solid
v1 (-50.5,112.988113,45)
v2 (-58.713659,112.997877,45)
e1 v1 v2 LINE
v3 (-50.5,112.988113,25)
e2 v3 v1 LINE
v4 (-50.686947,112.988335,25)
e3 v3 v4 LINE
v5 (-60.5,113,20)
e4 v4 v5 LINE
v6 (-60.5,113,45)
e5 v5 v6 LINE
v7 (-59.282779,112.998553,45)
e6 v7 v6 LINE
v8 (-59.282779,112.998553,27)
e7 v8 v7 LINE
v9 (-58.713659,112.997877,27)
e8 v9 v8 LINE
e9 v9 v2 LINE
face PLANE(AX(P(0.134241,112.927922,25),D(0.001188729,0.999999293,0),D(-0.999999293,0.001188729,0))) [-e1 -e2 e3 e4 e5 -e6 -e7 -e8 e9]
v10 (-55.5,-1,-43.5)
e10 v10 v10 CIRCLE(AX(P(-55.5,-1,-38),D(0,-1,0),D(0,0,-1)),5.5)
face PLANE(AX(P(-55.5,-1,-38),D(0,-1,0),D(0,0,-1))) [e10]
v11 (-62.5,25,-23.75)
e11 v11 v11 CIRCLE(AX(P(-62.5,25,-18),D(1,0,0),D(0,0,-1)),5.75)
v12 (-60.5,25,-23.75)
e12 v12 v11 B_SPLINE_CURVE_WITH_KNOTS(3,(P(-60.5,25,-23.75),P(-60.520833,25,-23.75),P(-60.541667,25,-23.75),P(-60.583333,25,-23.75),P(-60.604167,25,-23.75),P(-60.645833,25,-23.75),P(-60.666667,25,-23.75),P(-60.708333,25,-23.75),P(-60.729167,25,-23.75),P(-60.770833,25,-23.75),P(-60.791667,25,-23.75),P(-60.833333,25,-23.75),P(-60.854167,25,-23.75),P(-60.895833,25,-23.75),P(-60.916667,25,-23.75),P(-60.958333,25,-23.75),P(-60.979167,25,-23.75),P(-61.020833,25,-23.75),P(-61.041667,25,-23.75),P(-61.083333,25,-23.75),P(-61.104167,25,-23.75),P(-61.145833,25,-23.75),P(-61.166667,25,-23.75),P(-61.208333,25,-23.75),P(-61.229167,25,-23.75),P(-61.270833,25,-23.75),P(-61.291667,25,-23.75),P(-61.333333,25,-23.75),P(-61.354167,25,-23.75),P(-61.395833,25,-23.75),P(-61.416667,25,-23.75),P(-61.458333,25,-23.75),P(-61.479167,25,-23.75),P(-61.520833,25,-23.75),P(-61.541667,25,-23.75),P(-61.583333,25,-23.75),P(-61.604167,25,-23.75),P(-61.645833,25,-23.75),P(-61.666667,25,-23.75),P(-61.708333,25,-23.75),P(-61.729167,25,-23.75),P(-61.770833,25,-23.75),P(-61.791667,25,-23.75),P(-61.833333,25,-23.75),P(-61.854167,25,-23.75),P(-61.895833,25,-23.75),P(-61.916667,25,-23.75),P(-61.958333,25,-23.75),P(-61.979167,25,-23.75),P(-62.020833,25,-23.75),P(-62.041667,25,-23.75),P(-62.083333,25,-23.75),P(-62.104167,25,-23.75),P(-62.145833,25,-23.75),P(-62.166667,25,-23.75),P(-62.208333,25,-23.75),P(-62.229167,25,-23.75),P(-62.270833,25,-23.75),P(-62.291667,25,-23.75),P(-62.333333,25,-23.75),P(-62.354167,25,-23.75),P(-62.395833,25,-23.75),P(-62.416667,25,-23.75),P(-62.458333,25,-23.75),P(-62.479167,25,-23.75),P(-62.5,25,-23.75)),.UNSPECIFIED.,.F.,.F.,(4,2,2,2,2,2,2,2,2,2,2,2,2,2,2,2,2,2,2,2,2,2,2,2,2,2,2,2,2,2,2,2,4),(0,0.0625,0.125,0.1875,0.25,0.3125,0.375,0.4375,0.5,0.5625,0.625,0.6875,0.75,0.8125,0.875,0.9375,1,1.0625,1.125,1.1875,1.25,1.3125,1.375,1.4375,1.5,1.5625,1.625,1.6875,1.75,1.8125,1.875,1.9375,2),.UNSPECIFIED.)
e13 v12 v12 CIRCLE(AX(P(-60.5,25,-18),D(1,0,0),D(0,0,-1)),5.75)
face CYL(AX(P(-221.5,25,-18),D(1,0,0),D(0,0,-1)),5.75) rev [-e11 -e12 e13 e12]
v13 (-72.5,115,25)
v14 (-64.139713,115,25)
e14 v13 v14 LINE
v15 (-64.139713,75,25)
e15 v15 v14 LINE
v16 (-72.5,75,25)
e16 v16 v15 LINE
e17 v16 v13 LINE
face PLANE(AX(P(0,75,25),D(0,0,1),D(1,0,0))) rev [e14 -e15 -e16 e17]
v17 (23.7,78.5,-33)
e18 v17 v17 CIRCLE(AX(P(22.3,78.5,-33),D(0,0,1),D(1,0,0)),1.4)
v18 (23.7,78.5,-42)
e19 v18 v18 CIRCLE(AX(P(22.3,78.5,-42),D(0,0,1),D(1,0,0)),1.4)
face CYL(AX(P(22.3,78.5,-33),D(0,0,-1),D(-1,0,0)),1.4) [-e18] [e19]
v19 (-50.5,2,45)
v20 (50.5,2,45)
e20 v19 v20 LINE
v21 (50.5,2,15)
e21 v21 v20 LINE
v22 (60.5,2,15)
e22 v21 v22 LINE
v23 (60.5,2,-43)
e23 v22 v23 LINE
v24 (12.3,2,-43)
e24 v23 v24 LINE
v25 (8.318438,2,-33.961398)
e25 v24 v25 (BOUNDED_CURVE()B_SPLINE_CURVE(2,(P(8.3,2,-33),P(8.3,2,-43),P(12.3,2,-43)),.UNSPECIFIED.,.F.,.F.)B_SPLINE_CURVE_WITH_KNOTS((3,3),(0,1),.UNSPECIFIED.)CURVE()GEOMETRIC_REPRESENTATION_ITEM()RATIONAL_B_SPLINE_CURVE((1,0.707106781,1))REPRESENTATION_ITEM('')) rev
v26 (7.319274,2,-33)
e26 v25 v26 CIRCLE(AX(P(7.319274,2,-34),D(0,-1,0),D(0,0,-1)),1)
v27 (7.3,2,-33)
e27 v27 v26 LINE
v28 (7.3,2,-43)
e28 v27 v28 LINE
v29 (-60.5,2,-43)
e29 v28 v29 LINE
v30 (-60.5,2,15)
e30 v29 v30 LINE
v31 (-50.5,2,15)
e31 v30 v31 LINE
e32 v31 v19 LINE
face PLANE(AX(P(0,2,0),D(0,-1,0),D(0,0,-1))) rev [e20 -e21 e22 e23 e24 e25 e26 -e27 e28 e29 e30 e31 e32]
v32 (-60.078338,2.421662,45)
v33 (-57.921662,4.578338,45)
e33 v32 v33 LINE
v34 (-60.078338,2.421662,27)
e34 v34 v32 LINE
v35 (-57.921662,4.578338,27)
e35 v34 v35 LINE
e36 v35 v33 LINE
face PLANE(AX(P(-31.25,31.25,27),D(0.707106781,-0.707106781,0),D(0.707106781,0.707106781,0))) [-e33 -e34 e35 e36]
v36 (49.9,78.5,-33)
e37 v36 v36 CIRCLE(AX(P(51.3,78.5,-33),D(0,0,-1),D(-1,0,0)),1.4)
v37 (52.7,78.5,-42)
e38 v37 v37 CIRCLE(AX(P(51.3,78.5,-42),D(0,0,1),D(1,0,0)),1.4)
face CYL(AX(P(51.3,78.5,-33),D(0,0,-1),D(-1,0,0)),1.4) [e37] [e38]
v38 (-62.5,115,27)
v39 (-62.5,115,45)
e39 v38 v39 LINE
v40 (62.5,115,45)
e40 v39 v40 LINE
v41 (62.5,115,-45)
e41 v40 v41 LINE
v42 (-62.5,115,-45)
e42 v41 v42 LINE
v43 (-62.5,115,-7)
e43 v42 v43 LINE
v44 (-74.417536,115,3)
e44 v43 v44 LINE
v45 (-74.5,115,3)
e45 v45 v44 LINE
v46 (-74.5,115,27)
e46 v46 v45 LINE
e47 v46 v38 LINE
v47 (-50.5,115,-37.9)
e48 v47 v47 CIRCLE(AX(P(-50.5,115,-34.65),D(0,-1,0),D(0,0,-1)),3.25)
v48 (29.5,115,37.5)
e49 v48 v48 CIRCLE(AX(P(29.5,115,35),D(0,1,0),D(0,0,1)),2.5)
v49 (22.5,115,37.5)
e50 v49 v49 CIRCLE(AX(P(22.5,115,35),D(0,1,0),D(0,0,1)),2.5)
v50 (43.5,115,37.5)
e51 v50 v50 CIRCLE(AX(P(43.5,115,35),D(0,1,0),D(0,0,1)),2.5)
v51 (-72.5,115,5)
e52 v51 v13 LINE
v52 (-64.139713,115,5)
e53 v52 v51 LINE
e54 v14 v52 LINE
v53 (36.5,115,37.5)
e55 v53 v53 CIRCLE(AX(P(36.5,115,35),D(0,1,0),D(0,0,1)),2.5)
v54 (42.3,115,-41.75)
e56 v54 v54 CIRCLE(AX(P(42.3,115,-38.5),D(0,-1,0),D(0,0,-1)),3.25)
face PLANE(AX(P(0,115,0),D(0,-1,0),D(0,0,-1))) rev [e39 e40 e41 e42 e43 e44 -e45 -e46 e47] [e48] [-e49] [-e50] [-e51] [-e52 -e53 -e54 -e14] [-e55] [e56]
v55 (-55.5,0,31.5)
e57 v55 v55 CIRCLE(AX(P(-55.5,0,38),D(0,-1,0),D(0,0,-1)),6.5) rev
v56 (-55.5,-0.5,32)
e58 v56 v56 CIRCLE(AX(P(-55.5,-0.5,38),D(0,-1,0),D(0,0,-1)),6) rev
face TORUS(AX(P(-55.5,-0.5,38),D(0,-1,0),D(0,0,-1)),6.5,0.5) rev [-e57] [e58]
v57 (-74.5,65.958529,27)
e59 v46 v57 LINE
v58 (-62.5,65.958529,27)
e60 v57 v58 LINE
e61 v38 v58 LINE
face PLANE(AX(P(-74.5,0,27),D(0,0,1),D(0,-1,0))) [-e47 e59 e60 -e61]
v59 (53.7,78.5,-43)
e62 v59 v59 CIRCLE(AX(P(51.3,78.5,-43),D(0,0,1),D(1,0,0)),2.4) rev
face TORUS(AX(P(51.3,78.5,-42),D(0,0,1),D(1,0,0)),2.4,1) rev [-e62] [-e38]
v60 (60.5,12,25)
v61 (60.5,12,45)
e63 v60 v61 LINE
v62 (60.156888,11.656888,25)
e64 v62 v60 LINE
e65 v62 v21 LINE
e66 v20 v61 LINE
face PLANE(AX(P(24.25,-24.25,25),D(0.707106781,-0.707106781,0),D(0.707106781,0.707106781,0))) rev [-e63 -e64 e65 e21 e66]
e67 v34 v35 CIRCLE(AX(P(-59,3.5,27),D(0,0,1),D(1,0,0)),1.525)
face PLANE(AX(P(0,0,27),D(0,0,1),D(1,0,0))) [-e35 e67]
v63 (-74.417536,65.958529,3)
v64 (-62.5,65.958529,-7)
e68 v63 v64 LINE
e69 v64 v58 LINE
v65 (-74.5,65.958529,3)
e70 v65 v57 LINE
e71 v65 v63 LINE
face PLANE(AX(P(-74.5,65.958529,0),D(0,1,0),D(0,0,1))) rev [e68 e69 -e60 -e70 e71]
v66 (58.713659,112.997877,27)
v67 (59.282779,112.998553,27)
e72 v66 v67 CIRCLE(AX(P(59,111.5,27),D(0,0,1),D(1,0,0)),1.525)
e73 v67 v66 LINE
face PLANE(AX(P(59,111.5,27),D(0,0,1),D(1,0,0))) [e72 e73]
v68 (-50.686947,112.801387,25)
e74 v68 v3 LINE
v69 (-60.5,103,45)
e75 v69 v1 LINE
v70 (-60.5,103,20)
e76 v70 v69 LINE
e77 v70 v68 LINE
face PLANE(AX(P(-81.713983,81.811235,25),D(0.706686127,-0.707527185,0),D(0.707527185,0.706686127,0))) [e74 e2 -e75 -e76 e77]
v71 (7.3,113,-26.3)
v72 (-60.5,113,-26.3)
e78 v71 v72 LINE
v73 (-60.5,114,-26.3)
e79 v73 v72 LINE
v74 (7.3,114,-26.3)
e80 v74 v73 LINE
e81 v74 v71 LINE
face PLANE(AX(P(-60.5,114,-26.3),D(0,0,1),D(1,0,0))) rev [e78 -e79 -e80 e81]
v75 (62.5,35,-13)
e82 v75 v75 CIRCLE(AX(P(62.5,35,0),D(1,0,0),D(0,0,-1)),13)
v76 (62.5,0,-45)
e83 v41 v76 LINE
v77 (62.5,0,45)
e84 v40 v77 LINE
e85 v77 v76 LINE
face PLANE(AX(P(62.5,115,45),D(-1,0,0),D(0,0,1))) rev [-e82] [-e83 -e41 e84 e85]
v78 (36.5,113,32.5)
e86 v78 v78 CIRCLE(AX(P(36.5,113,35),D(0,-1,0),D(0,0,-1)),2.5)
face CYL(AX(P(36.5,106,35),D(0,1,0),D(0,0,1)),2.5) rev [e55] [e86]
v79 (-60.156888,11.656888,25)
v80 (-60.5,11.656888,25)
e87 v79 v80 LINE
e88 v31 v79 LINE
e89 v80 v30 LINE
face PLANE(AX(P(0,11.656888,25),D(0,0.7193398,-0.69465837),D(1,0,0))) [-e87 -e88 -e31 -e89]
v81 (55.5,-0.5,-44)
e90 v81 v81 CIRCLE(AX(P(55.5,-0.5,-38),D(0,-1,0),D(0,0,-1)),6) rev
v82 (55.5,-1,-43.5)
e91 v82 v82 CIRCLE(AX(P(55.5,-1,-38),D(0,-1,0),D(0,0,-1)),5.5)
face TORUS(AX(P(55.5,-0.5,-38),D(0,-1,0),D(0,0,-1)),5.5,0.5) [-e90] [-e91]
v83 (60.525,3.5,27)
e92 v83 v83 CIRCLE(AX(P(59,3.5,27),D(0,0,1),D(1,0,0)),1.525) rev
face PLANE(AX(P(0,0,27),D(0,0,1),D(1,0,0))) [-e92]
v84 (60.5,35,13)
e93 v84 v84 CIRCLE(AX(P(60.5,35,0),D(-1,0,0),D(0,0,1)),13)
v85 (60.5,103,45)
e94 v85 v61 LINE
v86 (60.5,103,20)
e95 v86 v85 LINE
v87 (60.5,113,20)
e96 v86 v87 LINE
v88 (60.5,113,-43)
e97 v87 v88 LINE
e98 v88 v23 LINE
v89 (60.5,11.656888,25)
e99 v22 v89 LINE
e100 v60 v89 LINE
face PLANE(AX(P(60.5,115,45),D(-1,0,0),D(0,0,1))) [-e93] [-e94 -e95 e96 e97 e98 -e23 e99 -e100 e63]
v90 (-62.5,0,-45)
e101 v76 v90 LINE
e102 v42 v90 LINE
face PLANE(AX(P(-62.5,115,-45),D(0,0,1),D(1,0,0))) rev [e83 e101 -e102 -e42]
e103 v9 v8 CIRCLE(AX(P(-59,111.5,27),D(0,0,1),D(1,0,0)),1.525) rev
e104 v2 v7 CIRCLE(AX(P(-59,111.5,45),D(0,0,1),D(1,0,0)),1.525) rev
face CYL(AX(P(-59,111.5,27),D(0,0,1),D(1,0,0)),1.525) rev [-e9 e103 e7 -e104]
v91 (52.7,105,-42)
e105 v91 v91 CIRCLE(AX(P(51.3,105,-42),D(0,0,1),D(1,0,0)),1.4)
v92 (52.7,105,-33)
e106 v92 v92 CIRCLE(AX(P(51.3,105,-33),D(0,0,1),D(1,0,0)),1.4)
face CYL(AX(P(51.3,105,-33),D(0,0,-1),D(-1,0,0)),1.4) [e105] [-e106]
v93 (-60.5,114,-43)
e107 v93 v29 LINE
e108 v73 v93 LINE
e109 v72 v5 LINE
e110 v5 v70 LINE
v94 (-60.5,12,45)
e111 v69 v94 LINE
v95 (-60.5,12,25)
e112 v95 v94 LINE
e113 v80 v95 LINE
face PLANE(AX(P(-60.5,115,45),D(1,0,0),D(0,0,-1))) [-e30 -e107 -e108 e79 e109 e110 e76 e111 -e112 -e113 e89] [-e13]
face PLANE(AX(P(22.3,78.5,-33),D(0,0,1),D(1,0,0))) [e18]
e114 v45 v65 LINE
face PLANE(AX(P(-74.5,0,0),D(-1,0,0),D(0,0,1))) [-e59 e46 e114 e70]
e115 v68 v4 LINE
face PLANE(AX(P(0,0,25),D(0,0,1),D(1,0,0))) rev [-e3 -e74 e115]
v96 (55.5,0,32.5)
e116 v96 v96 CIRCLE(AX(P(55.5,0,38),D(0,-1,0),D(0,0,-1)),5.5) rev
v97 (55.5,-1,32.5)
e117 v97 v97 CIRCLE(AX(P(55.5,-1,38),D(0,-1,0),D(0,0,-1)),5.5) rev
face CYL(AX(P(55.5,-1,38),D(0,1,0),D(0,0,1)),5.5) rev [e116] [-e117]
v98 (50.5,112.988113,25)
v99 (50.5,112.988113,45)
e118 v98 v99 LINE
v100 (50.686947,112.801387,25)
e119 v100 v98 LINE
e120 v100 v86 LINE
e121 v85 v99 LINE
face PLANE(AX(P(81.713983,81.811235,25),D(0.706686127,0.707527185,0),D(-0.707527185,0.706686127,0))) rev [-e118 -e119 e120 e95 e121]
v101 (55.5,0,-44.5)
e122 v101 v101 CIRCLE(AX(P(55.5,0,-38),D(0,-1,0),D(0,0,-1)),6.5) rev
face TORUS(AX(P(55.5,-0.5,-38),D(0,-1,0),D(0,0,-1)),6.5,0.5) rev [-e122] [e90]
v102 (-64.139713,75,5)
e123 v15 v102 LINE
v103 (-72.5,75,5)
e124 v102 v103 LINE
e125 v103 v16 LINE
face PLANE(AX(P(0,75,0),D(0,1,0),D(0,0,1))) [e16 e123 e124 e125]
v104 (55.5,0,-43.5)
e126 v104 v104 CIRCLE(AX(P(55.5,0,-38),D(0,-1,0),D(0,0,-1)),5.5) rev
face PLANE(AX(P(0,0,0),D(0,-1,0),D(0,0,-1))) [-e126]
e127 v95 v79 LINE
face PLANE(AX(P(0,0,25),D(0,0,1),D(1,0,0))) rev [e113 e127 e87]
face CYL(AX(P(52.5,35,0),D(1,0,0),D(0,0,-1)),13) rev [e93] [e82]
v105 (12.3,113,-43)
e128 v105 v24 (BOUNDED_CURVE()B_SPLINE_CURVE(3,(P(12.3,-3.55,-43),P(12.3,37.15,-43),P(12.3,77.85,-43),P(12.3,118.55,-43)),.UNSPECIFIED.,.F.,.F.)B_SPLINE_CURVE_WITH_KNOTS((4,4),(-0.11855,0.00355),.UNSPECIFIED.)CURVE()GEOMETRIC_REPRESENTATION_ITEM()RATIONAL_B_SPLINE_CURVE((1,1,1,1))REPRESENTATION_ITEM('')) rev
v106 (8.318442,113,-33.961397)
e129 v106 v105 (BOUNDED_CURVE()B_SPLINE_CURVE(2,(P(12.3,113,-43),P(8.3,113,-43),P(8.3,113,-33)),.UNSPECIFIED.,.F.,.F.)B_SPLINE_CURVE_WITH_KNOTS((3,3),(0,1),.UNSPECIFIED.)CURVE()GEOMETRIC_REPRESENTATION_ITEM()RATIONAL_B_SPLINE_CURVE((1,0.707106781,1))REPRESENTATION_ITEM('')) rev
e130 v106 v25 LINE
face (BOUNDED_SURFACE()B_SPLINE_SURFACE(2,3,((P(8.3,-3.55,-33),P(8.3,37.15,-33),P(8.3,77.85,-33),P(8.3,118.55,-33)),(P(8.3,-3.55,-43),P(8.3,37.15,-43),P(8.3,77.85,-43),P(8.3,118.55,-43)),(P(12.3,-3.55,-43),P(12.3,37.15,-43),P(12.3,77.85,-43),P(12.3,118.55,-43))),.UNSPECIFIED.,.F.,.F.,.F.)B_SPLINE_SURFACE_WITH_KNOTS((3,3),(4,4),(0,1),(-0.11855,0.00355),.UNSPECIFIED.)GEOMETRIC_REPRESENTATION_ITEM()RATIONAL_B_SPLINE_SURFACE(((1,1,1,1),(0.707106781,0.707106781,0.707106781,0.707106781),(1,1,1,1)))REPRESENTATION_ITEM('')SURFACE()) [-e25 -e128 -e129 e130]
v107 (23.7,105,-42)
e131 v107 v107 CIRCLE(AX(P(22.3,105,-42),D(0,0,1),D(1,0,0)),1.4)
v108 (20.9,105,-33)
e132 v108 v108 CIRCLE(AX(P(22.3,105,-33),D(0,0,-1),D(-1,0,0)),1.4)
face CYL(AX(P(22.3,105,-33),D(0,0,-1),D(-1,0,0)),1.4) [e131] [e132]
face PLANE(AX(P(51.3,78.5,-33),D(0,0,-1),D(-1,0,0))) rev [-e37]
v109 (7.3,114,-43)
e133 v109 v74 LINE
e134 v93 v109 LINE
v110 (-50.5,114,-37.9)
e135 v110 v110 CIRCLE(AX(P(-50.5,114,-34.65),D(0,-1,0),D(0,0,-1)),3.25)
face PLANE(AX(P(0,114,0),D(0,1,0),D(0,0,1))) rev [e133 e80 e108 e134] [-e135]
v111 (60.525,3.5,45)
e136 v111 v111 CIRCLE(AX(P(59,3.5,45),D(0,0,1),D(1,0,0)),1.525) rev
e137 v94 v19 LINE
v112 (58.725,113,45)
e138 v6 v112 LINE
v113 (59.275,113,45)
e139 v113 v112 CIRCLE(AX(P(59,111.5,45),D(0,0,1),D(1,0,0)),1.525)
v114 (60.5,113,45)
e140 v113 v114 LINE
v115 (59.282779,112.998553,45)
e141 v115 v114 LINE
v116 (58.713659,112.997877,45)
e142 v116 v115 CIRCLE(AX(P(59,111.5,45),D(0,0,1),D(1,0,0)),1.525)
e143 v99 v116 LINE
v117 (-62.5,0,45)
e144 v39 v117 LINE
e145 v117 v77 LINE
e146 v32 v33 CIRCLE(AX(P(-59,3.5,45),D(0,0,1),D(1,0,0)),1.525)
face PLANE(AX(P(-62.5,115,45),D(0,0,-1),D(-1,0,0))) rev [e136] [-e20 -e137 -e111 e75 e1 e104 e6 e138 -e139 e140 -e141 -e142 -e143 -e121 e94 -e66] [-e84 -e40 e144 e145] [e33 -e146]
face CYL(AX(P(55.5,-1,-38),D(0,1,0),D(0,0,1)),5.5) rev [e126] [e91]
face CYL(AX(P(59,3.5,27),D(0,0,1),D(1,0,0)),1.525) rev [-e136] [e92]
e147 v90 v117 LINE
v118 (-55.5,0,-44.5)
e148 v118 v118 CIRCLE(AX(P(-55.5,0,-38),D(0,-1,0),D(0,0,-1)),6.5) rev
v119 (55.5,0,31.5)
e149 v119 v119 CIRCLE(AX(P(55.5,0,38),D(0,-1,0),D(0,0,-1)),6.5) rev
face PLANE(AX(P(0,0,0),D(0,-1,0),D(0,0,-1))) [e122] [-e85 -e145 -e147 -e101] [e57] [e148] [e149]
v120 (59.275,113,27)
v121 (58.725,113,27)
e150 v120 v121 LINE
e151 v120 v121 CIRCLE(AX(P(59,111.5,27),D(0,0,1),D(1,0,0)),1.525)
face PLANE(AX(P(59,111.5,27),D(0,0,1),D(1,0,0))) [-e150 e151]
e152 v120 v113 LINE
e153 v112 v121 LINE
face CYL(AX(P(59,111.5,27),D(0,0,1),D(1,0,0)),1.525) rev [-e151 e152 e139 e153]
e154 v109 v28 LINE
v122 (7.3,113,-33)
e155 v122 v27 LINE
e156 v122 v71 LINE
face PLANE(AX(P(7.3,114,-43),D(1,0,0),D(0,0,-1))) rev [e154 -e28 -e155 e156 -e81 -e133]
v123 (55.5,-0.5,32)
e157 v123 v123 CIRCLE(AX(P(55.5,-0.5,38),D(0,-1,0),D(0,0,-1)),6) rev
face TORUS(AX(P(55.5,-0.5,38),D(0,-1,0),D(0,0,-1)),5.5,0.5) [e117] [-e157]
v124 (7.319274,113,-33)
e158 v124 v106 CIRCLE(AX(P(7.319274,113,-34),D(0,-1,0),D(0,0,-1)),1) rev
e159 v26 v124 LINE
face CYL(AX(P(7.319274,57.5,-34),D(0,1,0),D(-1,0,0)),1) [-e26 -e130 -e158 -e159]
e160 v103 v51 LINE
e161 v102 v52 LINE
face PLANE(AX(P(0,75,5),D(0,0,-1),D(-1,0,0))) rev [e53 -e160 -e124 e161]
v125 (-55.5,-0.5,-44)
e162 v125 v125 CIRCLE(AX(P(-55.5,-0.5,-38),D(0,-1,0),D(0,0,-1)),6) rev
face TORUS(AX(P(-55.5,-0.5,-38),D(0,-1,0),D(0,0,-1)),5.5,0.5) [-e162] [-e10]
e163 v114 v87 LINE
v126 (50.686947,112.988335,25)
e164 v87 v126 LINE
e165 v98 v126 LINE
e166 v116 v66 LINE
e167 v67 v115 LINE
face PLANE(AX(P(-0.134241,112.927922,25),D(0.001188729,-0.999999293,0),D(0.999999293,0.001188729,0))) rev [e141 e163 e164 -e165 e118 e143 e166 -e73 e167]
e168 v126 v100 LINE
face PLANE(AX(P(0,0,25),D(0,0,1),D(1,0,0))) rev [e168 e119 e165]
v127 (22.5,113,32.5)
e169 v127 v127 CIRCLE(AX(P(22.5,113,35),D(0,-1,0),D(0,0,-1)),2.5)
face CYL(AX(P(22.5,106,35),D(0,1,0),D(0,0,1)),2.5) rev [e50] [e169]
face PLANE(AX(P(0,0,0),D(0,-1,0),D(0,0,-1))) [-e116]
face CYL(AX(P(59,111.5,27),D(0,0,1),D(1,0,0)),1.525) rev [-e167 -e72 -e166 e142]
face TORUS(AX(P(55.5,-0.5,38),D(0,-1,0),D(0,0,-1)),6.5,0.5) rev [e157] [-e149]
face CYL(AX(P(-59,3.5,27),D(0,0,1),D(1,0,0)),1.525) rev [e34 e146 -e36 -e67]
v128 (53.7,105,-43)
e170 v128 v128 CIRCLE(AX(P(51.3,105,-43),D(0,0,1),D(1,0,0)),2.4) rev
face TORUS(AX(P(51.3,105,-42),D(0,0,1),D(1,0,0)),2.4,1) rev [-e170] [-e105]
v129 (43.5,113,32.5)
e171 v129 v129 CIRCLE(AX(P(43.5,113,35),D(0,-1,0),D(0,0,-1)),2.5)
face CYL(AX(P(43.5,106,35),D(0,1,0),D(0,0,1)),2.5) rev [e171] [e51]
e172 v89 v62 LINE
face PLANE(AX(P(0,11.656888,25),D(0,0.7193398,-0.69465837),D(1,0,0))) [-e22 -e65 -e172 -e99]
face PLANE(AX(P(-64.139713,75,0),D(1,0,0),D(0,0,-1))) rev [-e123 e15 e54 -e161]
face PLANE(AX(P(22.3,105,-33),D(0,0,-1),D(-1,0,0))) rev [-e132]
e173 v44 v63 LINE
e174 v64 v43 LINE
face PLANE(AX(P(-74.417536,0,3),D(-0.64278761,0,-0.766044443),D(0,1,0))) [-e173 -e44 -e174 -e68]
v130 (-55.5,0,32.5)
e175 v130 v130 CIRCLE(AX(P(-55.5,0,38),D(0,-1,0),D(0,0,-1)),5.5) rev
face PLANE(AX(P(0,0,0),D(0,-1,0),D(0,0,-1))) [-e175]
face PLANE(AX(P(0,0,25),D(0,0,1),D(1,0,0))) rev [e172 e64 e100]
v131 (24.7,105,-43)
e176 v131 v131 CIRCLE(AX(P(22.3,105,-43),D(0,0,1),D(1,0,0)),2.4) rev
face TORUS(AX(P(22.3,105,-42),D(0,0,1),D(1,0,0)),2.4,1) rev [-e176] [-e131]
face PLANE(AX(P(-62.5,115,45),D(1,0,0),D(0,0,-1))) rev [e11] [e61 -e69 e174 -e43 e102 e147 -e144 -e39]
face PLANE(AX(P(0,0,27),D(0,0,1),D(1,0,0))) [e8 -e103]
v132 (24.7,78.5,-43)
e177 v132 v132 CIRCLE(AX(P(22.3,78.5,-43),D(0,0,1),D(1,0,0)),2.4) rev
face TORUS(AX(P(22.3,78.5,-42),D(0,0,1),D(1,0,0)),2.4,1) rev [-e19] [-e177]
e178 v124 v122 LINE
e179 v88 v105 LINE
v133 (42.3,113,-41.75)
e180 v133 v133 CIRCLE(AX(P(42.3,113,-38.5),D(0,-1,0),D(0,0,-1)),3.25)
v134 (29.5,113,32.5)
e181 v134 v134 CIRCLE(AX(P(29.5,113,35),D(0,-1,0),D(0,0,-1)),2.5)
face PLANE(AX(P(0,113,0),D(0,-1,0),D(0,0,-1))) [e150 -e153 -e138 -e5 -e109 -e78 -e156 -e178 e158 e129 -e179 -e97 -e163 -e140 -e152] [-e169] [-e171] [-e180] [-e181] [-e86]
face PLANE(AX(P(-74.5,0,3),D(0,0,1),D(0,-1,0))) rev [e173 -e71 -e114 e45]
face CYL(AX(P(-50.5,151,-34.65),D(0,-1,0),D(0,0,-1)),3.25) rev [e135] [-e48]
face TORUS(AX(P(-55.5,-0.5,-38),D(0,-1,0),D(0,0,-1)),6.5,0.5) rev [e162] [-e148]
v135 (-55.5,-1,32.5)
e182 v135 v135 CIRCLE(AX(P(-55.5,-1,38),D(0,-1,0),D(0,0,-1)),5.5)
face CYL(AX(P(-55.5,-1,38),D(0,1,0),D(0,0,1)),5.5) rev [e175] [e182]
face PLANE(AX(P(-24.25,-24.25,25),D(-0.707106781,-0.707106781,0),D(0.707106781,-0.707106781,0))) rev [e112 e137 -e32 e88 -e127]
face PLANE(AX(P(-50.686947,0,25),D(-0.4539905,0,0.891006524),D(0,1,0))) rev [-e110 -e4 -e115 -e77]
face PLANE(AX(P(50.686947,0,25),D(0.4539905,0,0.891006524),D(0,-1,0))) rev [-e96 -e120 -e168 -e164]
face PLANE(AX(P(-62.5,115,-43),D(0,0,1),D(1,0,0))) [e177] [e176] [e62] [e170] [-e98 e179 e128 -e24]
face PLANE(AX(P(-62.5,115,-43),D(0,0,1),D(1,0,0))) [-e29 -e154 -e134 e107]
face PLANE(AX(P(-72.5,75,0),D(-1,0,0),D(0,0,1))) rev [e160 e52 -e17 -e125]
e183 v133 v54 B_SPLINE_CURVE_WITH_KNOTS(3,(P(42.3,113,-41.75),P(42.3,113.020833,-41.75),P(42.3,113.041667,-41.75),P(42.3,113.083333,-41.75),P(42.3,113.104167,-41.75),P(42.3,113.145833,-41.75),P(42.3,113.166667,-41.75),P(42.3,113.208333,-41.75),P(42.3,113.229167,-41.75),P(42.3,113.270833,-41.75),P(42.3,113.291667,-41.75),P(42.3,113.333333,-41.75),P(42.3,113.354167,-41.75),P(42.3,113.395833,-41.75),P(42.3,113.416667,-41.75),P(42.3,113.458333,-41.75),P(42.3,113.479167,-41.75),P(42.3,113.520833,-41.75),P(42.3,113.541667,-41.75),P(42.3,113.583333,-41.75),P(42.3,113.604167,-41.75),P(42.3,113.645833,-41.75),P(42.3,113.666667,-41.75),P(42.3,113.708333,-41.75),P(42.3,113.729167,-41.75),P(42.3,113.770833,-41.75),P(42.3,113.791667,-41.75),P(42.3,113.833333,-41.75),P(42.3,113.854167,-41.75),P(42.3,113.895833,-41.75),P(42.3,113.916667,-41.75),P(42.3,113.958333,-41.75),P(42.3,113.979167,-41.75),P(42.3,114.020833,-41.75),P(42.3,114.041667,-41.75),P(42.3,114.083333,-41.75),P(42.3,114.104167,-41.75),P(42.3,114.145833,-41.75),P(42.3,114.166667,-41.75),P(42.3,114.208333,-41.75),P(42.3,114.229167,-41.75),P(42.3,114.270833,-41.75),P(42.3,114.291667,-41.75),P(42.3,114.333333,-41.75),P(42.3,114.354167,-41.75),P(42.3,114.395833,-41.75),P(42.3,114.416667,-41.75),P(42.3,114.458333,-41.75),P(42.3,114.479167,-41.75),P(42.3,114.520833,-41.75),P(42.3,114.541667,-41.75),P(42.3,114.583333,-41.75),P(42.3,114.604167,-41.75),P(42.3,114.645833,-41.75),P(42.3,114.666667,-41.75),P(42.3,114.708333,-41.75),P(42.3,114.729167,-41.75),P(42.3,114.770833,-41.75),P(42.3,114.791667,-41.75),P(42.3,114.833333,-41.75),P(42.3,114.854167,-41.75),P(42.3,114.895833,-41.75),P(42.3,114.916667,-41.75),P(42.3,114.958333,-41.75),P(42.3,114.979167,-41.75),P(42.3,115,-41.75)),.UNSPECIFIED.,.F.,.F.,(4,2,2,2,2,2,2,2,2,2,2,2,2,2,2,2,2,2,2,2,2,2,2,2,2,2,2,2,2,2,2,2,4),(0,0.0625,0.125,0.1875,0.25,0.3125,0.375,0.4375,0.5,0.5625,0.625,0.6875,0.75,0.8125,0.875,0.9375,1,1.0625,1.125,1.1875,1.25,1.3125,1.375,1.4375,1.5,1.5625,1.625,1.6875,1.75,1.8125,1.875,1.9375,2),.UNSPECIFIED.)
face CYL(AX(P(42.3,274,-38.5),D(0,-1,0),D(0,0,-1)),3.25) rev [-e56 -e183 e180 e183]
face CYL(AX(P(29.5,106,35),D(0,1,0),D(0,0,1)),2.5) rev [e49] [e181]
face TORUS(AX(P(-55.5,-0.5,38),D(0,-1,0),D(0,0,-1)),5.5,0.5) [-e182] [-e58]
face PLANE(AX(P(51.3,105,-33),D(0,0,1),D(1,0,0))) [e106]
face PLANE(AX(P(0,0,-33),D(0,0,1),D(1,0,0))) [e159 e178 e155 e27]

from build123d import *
from OCP.BRepFilletAPI import BRepFilletAPI_MakeChamfer

# Parameters (mm, degrees)
SKETCH1_W              = 125
SKETCH1_H              = 90
BOSS_EXTRUDE1_DEPTH    = 115
SHELL1_T               = -2
SKETCH4_W              = 67.8
SKETCH4_H              = 16.7
CUT_EXTRUDE1_DEPTH     = 1
SKETCH5_R              = 3.25
CUT_EXTRUDE2_DEPTH     = 37
SKETCH6_W              = 1
SKETCH6_H              = 111
BOSS_EXTRUDE2_DEPTH    = 10
FILLET1_SIZE           = 4
FILLET1_SIZE_2         = 10
FILLET2_R              = 1
SKETCH7_R              = 13
CUT_EXTRUDE3_DEPTH     = 10
SKETCH8_W              = 24
SKETCH8_H              = 49.041471127
BOSS_EXTRUDE3_DEPTH    = 12
CHAMFER1_SIZE          = 10
CHAMFER1_SIZE2         = 11.917535926
CUT_EXTRUDE4_DEPTH     = 40
SKETCH10_R             = 1.4
BOSS_EXTRUDE4_DEPTH    = 10
FILLET3_R              = 1
SKETCH11_R             = 3.25
CUT_EXTRUDE5_DEPTH     = 161
SKETCH13_R             = 5.75
CUT_EXTRUDE6_DEPTH     = 161
SKETCH14_R             = 6
SKETCH14_R_2           = 5.5
BOSS_EXTRUDE5_DEPTH    = 1
FILLET4_R              = 0.5
FILLET5_R              = 0.5
CUT_EXTRUDE7_DEPTH     = 9
BOSS_EXTRUDE6_DEPTH    = 20
CHAMFER2_SIZE          = 10
CHAMFER2_SIZE2         = 9.656887748
CHAMFER3_SIZE          = 5
CHAMFER3_SIZE2         = 9.813052528
CUT_EXTRUDE8_START     = -18
CUT_EXTRUDE8_OUTLINE_R = 1.525
CUT_EXTRUDE8_DEPTH     = 18


# Read off the part's stored shape, not the designer's step: Cut-Extrude8
# Some blends are built 0.0001 mm under size
with BuildPart() as part:
    # Sketch1 → Boss-Extrude1 (new body)
    with BuildSketch(Plane(origin=(0, 0, 0), x_dir=(1, 0, 0), z_dir=(0, 1, 0))):
        Rectangle(SKETCH1_W, SKETCH1_H)
    extrude(amount=BOSS_EXTRUDE1_DEPTH)

    # Shell1
    shell1_openings = [part.faces().sort_by_distance(p)[0] for p in [
        (0, 57.5, 45),
    ]]
    offset(amount=SHELL1_T, openings=shell1_openings, kind=Kind.INTERSECTION)

    # Sketch4 → Cut-Extrude1 (cut)
    with BuildSketch(Plane.XZ.offset(-113)):
        with Locations((-26.6, -34.65)):
            Rectangle(SKETCH4_W, SKETCH4_H)
    extrude(amount=-CUT_EXTRUDE1_DEPTH, mode=Mode.SUBTRACT)

    # Sketch5 → Cut-Extrude2 (cut)
    with BuildSketch(Plane.XZ.offset(-114)):
        with Locations(Location((-50.5, -34.65, 0), (0, 0, 270))):
            Circle(SKETCH5_R)
    extrude(amount=-CUT_EXTRUDE2_DEPTH, mode=Mode.SUBTRACT)

    # Sketch6 → Boss-Extrude2 (add)
    with BuildSketch(Plane.XY.offset(-43)):
        with Locations((7.8, 57.5)):
            Rectangle(SKETCH6_W, SKETCH6_H)
    extrude(amount=BOSS_EXTRUDE2_DEPTH)

    # Fillet1
    # an asymmetric fillet: 10, 4 mm, written as the material it adds along each edge
    with BuildSketch(Plane(origin=(8.3, 2, -43), x_dir=(1, 0, 0), z_dir=(0, 1, 0))) as fillet1_piece_1:
        with BuildLine():
            Bezier((FILLET1_SIZE, 0), (0, 0), (0, -FILLET1_SIZE_2), weights=[1, 0.707106781, 1])
            Line((0, -FILLET1_SIZE_2), (0, 0))
            Line((0, 0), (FILLET1_SIZE, 0))
        make_face()
    extrude(amount=111)

    # Fillet2
    fillet2_edges = [part.edges().sort_by_distance(p)[0] for p in [
        (8.3, 57.5, -33),
    ]]
    fillet(fillet2_edges, radius=FILLET2_R)

    # Sketch7 → Cut-Extrude3 (cut)
    with BuildSketch(Plane(origin=(62.5, 0, 0), x_dir=(0, 0, -1), z_dir=(1, 0, 0))):
        with Locations((0, 35)):
            Circle(SKETCH7_R)
    extrude(amount=-CUT_EXTRUDE3_DEPTH, mode=Mode.SUBTRACT)

    # Sketch8 → Boss-Extrude3 (add)
    with BuildSketch(Plane.ZY.offset(62.5)):
        with Locations((15, 90.479264437)):
            Rectangle(SKETCH8_W, SKETCH8_H)
    extrude(amount=BOSS_EXTRUDE3_DEPTH)

    # Chamfer1
    chamfer1_edges = [part.edges().sort_by_distance(p)[0] for p in [
        (-62.5, 90.479264436, 3),
    ]]
    chamfer1_side = [part.faces().sort_by_distance(p)[0] for p in [
        (-62.5, 53.268405144, -1.924661569),
    ]]
    chamfer(chamfer1_edges, length=CHAMFER1_SIZE, length2=CHAMFER1_SIZE2, reference=chamfer1_side[0])

    # Sketch9 → Cut-Extrude4 (cut)
    with BuildSketch(Plane(origin=(0, 115, 0), x_dir=(1, 0, 0), z_dir=(0, 1, 0))):
        Polygon((-64.139712889, -5), (-72.5, -5), (-72.5, -21.393203559), (-72.5, -25), (-64.139712889, -25), align=None)
    extrude(amount=-CUT_EXTRUDE4_DEPTH, mode=Mode.SUBTRACT)

    # Sketch10 → Boss-Extrude4 (add)
    with BuildSketch(Plane.XY.offset(-43)):
        with Locations((22.3, 78.5)):
            Circle(SKETCH10_R)
        with Locations(Location((51.3, 78.5, 0), (0, 0, 180))):
            Circle(SKETCH10_R)
        with Locations((51.3, 105)):
            Circle(SKETCH10_R)
        with Locations(Location((22.3, 105, 0), (0, 0, 180))):
            Circle(SKETCH10_R)
    extrude(amount=BOSS_EXTRUDE4_DEPTH)

    # Fillet3
    fillet3_edges = [part.edges().sort_by_distance(p)[0] for p in [
        (23.7, 105, -43),
        (49.9, 105, -43),
        (52.7, 78.5, -43),
        (20.9, 78.5, -43),
    ]]
    fillet(fillet3_edges, radius=FILLET3_R)

    # Sketch11 → Cut-Extrude5 (cut)
    with BuildSketch(Plane.XZ.offset(-113)):
        with Locations(Location((42.3, -38.5, 0), (0, 0, 270))):
            Circle(SKETCH11_R)
    extrude(amount=-CUT_EXTRUDE5_DEPTH, mode=Mode.SUBTRACT)

    # Sketch13 → Cut-Extrude6 (cut)
    with BuildSketch(Plane(origin=(-60.5, 0, 0), x_dir=(0, 0, -1), z_dir=(1, 0, 0))):
        with Locations((18, 25)):
            Circle(SKETCH13_R)
    extrude(amount=-CUT_EXTRUDE6_DEPTH, mode=Mode.SUBTRACT)

    # Sketch14 → Boss-Extrude5 (add)
    # profile 1 of 4: a face of its own
    with BuildSketch(Plane.XZ):
        with Locations(Location((-55.5, 38, 0), (0, 0, 270))):
            Circle(SKETCH14_R)
        with Locations(Location((-55.5, 38, 0), (0, 0, 270))):
            Circle(SKETCH14_R_2, mode=Mode.SUBTRACT)
    # profile 2 of 4: a face of its own
    with BuildSketch(Plane.XZ):
        with Locations(Location((55.5, 38, 0), (0, 0, 270))):
            Circle(SKETCH14_R)
        with Locations(Location((55.5, 38, 0), (0, 0, 270))):
            Circle(SKETCH14_R_2, mode=Mode.SUBTRACT)
    # profile 3 of 4: a face of its own
    with BuildSketch(Plane.XZ):
        with Locations(Location((55.5, -38, 0), (0, 0, 270))):
            Circle(SKETCH14_R)
        with Locations(Location((55.5, -38, 0), (0, 0, 270))):
            Circle(SKETCH14_R_2, mode=Mode.SUBTRACT)
    # profile 4 of 4: a face of its own
    with BuildSketch(Plane.XZ):
        with Locations(Location((-55.5, -38, 0), (0, 0, 270))):
            Circle(SKETCH14_R)
    extrude(amount=BOSS_EXTRUDE5_DEPTH)

    # Fillet4
    fillet4_edges = [part.edges().sort_by_distance(p)[0] for p in [
        (-55.5, -1, 44),
        (-55.5, 0, 44),
    ]]
    fillet(fillet4_edges, radius=FILLET4_R - 0.0001)  # a hair under: the kernel refuses the full size

    # Fillet5
    fillet5_edges = [part.edges().sort_by_distance(p)[0] for p in [
        (55.5, 0, -32),
        (55.5, -1, -32),
        (55.5, 0, 44),
        (55.5, -1, 44),
        (-55.5, 0, -32),
        (-55.5, -1, -32),
    ]]
    fillet(fillet5_edges, radius=FILLET5_R - 0.0001)  # a hair under: the kernel refuses the full size

    # Sketch17 → Cut-Extrude7 (cut)
    with BuildSketch(Plane(origin=(0, 115, 0), x_dir=(1, 0, 0), z_dir=(0, 1, 0))):
        with BuildLine():
            ThreePointArc((25, -35), (20.732233047, -33.232233047), (22.5, -37.5))
            Line((22.5, -37.5), (22.5, -35))
            Line((22.5, -35), (25, -35))
        make_face()
        with BuildLine():
            Line((22.5, -35), (22.5, -37.5))
            ThreePointArc((22.5, -37.5), (24.267766953, -36.767766953), (25, -35))
            Line((25, -35), (22.5, -35))
        make_face()
        with BuildLine():
            ThreePointArc((32, -35), (29.5, -32.5), (27, -35))
            Line((27, -35), (32, -35))
        make_face()
        with BuildLine():
            Line((32, -35), (27, -35))
            ThreePointArc((27, -35), (29.5, -37.5), (32, -35))
        make_face()
        with BuildLine():
            ThreePointArc((39, -35), (36.5, -32.5), (34, -35))
            Line((34, -35), (39, -35))
        make_face()
        with BuildLine():
            Line((39, -35), (34, -35))
            ThreePointArc((34, -35), (36.5, -37.5), (39, -35))
        make_face()
        with BuildLine():
            ThreePointArc((46, -35), (43.5, -32.5), (41, -35))
            Line((41, -35), (46, -35))
        make_face()
        with BuildLine():
            Line((46, -35), (41, -35))
            ThreePointArc((41, -35), (43.5, -37.5), (46, -35))
        make_face()
    extrude(amount=-CUT_EXTRUDE7_DEPTH, mode=Mode.SUBTRACT)

    # Sketch18 → Boss-Extrude6 (add)
    with BuildSketch(Plane.XY.offset(45)):
        Polygon((-50.5, 2), (-60.5, 12), (-60.5, 2), align=None)
        Polygon((-60.5, 113), (-60.5, 103), (-50.5, 112.988112704), align=None)
        Polygon((50.5, 112.988112704), (60.5, 103), (60.5, 113), align=None)
        Polygon((60.5, 12), (50.5, 2), (60.5, 2), align=None)
    extrude(amount=-BOSS_EXTRUDE6_DEPTH)

    # Chamfer2
    chamfer2_edges = [part.edges().sort_by_distance(p)[0] for p in [
        (-55.5, 2, 25),
        (55.5, 2, 25),
    ]]
    chamfer2_side = [part.faces().sort_by_distance(p)[0] for p in [
        (-0.015179925, 2, -0.25697617),
    ]]
    chamfer(chamfer2_edges, length=CHAMFER2_SIZE, length2=CHAMFER2_SIZE2, reference=chamfer2_side[0])

    # Chamfer3: one chamfer whose edges measure the first distance from different faces: ONE call of the kernel's chamfer builder (chamfer() names one face for all edges)
    chamfer3_edges_1 = [part.edges().sort_by_distance(p)[0] for p in [
        (-60.5, 108, 25),
    ]]
    chamfer3_side_1 = [part.faces().sort_by_distance(p)[0] for p in [
        (-60.5, 58.240348279, -0.431861074),
    ]]
    chamfer3_edges_2 = [part.edges().sort_by_distance(p)[0] for p in [
        (60.5, 108, 25),
    ]]
    chamfer3_side_2 = [part.faces().sort_by_distance(p)[0] for p in [
        (60.5, 59.1464465, -0.600556504),
    ]]
    chamfer3 = BRepFilletAPI_MakeChamfer(part.part.solid().wrapped)
    for e in chamfer3_edges_1:
        chamfer3.Add(CHAMFER3_SIZE, CHAMFER3_SIZE2, e.wrapped, chamfer3_side_1[0].wrapped)  # the first distance lies on this face
    for e in chamfer3_edges_2:
        chamfer3.Add(CHAMFER3_SIZE, CHAMFER3_SIZE2, e.wrapped, chamfer3_side_2[0].wrapped)  # the first distance lies on this face
    add(Compound.cast(chamfer3.Shape()), mode=Mode.REPLACE)

    # Cut-Extrude8 outline → Cut-Extrude8 (cut)
    with BuildSketch(Plane.XY.offset(45).offset(CUT_EXTRUDE8_START)):
        with BuildLine():
            Line((59.282778619, 112.998553053), (58.713659436, 112.997876524))
            ThreePointArc((58.713659436, 112.997876524), (59.001812812, 109.975001077), (59.282778619, 112.998553053))
        make_face()
        with BuildLine():
            Line((-58.713659436, 112.997876524), (-59.282778619, 112.998553053))
            ThreePointArc((-59.282778619, 112.998553053), (-59.001812812, 109.975001077), (-58.713659436, 112.997876524))
        make_face()
        with BuildLine():
            Line((58.725, 113), (59.275, 113))
            ThreePointArc((59.275, 113), (59, 113.025), (58.725, 113))
        make_face()
        with Locations((59, 3.5)):
            Circle(CUT_EXTRUDE8_OUTLINE_R)
        with BuildLine():
            Line((-57.921662159, 4.578337841), (-60.078337841, 2.421662159))
            ThreePointArc((-60.078337841, 2.421662159), (-57.921662159, 2.421662159), (-57.921662159, 4.578337841))
        make_face()
    extrude(amount=CUT_EXTRUDE8_DEPTH, mode=Mode.SUBTRACT)


solid = part.part
